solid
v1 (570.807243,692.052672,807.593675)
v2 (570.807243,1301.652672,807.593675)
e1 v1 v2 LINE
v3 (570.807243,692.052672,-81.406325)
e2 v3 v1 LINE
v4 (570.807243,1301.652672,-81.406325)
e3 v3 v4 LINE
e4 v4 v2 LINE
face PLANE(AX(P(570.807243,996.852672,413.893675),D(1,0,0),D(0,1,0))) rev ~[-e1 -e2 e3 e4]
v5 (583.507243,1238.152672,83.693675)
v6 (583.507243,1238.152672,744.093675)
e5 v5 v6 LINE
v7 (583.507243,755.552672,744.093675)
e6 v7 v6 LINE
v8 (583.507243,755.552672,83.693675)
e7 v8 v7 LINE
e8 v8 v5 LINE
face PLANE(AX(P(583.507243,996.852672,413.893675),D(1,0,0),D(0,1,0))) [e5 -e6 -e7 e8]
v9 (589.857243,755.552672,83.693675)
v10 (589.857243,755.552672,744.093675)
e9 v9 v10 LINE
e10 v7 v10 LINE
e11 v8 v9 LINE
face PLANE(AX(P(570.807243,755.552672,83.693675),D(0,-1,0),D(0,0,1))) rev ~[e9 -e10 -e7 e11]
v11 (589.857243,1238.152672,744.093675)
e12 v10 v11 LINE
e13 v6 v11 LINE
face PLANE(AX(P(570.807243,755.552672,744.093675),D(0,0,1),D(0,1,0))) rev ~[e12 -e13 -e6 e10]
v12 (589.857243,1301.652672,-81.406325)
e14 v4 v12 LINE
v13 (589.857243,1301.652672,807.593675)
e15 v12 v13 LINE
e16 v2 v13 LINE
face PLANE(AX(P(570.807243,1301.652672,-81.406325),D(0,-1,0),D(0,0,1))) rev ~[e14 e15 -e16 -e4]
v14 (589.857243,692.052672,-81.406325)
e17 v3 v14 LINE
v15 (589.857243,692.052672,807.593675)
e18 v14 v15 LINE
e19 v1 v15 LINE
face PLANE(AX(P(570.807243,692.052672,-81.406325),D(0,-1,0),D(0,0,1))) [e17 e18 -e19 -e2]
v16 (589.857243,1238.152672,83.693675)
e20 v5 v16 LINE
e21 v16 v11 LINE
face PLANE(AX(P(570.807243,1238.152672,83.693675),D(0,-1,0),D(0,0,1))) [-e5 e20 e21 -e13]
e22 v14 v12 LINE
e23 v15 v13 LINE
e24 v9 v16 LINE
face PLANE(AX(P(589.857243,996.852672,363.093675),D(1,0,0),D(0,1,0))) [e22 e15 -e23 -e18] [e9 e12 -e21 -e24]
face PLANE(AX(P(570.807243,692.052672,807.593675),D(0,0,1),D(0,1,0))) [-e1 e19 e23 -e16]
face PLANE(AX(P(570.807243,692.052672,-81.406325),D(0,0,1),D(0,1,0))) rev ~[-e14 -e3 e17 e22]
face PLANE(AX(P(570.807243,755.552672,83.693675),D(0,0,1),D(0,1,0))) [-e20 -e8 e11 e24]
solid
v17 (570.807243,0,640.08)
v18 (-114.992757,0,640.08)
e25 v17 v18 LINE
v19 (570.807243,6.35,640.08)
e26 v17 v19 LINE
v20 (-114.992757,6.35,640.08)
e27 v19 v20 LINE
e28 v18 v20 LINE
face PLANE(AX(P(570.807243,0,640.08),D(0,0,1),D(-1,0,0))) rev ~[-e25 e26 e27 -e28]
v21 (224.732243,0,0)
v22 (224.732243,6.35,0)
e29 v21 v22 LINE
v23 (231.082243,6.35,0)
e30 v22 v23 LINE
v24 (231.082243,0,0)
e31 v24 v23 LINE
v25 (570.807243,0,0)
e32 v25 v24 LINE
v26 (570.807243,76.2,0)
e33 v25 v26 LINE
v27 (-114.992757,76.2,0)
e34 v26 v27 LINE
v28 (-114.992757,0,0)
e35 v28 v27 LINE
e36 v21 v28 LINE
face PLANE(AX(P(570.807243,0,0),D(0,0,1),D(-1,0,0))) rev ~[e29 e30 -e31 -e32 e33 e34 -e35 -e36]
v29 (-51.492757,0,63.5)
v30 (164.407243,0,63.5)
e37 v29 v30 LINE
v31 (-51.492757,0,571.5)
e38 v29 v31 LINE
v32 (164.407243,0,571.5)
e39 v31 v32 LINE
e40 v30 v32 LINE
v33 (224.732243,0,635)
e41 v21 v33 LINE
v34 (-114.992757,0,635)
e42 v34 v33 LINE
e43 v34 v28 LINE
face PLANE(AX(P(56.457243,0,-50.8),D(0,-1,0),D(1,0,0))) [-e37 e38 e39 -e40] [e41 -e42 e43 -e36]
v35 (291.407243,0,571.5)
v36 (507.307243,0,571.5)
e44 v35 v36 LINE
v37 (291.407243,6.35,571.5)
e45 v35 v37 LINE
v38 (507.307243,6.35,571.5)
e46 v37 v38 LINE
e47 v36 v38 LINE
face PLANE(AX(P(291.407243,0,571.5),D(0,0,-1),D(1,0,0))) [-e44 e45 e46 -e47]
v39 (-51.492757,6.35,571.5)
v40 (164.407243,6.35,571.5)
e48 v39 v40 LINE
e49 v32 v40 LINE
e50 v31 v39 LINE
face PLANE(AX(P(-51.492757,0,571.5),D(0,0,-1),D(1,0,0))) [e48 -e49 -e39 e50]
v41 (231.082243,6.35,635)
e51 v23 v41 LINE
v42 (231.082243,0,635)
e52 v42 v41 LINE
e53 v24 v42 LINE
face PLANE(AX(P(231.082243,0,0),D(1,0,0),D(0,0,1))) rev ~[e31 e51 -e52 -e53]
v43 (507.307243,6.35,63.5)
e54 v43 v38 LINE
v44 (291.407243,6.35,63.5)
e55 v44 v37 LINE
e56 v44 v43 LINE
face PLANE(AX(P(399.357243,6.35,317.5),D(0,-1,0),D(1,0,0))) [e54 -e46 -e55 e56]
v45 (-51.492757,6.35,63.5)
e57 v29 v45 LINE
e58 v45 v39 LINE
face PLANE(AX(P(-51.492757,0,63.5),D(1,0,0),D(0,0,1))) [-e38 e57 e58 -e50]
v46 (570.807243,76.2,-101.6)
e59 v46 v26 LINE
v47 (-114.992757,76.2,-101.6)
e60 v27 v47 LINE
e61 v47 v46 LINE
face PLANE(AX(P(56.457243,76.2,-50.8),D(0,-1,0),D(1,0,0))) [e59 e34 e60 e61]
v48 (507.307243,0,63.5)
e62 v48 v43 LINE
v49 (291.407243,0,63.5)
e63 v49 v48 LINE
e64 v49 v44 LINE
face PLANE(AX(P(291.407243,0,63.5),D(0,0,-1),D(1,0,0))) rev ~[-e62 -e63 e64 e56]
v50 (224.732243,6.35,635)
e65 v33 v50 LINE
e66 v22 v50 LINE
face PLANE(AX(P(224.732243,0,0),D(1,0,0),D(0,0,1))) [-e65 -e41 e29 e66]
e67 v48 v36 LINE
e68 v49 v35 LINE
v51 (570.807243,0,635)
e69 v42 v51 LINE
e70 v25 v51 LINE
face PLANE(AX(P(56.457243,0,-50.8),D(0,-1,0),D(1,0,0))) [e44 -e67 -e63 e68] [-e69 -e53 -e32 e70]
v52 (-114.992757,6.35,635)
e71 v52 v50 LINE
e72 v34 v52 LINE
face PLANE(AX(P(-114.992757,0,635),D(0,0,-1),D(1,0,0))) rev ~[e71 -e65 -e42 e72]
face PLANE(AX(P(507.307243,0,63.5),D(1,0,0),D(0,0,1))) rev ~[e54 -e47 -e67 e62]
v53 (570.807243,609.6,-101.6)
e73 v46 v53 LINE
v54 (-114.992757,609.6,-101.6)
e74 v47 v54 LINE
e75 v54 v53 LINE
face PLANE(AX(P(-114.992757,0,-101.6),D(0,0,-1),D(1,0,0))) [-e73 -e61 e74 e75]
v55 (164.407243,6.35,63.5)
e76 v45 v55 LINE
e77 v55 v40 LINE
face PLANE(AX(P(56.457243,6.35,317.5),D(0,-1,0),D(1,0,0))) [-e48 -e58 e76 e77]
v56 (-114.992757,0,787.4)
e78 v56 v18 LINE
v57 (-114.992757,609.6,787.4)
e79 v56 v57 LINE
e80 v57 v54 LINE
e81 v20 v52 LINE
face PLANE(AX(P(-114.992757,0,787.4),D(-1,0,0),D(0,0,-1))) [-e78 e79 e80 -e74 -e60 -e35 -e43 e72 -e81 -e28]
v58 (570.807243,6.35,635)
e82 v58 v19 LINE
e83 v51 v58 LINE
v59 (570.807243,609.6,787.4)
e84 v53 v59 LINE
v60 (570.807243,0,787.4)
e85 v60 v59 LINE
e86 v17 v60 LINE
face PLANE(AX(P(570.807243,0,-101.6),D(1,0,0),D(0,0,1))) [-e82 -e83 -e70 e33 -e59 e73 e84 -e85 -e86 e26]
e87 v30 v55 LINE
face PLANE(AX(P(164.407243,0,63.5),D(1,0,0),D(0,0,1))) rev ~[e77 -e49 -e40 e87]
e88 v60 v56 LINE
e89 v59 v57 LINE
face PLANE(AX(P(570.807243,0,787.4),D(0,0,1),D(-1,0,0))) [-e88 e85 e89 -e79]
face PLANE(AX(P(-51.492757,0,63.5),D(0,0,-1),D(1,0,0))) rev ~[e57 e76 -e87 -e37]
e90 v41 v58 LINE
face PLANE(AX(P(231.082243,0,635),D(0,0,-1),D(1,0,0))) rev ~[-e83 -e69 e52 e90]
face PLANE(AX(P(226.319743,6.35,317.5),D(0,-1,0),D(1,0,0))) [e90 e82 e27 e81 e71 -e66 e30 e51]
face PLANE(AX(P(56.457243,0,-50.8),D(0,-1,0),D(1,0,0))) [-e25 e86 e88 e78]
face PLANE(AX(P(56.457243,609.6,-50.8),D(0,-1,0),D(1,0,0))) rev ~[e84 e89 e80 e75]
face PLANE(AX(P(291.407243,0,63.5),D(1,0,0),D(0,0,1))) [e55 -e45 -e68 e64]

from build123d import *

# Parameters (mm, degrees)
F0_W     = 3.175
F0_H     = 635
F0_W_2   = 339.725
F0_W_3   = 215.9
F0_H_2   = 508
F0_W_4   = 342.9
F0_H_3   = 147.32
F1_DEPTH = 609.6
F2_DEPTH = 6.35
F3_DEPTH = 76.2
F4_W     = 609.6
F4_H     = 889
F4_W_2   = 482.6
F4_H_2   = 660.4
F5_DEPTH = 19.05
F6_DEPTH = 12.7


with BuildPart() as f1:
    # F0 (on Front) → F1 (new body)
    with BuildSketch(Plane.XZ):
        Polygon((227.9072425127, -101.6), (227.9072425127, 0), (224.7322425127, 0), (-114.9927574873, 0), (-114.9927574873, -101.6), align=None)
        with Locations((226.3197425127, 317.5)):
            Rectangle(F0_W, F0_H)
        Polygon((231.0822425127, 0), (227.9072425127, 0), (227.9072425127, -101.6), (570.8072425127, -101.6), (570.8072425127, 0), align=None)
        with Locations((229.4947425127, 317.5)):
            Rectangle(F0_W, F0_H)
        with Locations((54.8697425127, 317.5)):
            Rectangle(F0_W_2, F0_H)
        with Locations((56.4572425127, 317.5)):
            Rectangle(F0_W_3, F0_H_2, mode=Mode.SUBTRACT)
        Polygon((224.7322425127, 635), (227.9072425127, 635), (227.9072425127, 640.08), (-114.9927574873, 640.08), (-114.9927574873, 635), align=None)
        Polygon((227.9072425127, 640.08), (227.9072425127, 635), (231.0822425127, 635), (570.8072425127, 635), (570.8072425127, 640.08), align=None)
        with Locations((400.9447425127, 317.5)):
            Rectangle(F0_W_2, F0_H)
        with Locations((399.3572425127, 317.5)):
            Rectangle(F0_W_3, F0_H_2, mode=Mode.SUBTRACT)
        with Locations((56.4572425127, 713.74)):
            Rectangle(F0_W_4, F0_H_3)
        with Locations((399.3572425127, 713.74)):
            Rectangle(F0_W_4, F0_H_3)
        with Locations((56.4572425127, 317.5)):
            Rectangle(F0_W_3, F0_H_2)
        with Locations((399.3572425127, 317.5)):
            Rectangle(F0_W_3, F0_H_2)
    extrude(amount=-F1_DEPTH)

    # F0 (on Front) → F2 (cut)
    with BuildSketch(Plane.XZ):
        with Locations((226.3197425127, 317.5)):
            Rectangle(F0_W, F0_H)
        with Locations((229.4947425127, 317.5)):
            Rectangle(F0_W, F0_H)
        Polygon((224.7322425127, 635), (227.9072425127, 635), (227.9072425127, 640.08), (-114.9927574873, 640.08), (-114.9927574873, 635), align=None)
        Polygon((227.9072425127, 640.08), (227.9072425127, 635), (231.0822425127, 635), (570.8072425127, 635), (570.8072425127, 640.08), align=None)
        with Locations((56.4572425127, 317.5)):
            Rectangle(F0_W_3, F0_H_2)
        with Locations((399.3572425127, 317.5)):
            Rectangle(F0_W_3, F0_H_2)
    extrude(amount=-F2_DEPTH, mode=Mode.SUBTRACT)

    # F0 (on Front) → F3 (cut)
    with BuildSketch(Plane.XZ):
        Polygon((227.9072425127, -101.6), (227.9072425127, 0), (224.7322425127, 0), (-114.9927574873, 0), (-114.9927574873, -101.6), align=None)
        Polygon((231.0822425127, 0), (227.9072425127, 0), (227.9072425127, -101.6), (570.8072425127, -101.6), (570.8072425127, 0), align=None)
    extrude(amount=-F3_DEPTH, mode=Mode.SUBTRACT)


with BuildPart() as f5:
    # F4 (on face) → F5 (new body)
    with BuildSketch(Plane.YZ.offset(570.8072425127)):
        with Locations((996.8526720047, 363.0936748981)):
            Rectangle(F4_W, F4_H)
        with Locations((996.8526720047, 413.8936748981)):
            Rectangle(F4_W_2, F4_H_2, mode=Mode.SUBTRACT)
    extrude(amount=F5_DEPTH)

    # F4 (on face) → F6 (join)
    with BuildSketch(Plane.YZ.offset(570.8072425127)):
        with Locations((996.8526720047, 413.8936748981)):
            Rectangle(F4_W_2, F4_H_2)
    extrude(amount=F6_DEPTH)


solid = Compound([f1.part, f5.part])
